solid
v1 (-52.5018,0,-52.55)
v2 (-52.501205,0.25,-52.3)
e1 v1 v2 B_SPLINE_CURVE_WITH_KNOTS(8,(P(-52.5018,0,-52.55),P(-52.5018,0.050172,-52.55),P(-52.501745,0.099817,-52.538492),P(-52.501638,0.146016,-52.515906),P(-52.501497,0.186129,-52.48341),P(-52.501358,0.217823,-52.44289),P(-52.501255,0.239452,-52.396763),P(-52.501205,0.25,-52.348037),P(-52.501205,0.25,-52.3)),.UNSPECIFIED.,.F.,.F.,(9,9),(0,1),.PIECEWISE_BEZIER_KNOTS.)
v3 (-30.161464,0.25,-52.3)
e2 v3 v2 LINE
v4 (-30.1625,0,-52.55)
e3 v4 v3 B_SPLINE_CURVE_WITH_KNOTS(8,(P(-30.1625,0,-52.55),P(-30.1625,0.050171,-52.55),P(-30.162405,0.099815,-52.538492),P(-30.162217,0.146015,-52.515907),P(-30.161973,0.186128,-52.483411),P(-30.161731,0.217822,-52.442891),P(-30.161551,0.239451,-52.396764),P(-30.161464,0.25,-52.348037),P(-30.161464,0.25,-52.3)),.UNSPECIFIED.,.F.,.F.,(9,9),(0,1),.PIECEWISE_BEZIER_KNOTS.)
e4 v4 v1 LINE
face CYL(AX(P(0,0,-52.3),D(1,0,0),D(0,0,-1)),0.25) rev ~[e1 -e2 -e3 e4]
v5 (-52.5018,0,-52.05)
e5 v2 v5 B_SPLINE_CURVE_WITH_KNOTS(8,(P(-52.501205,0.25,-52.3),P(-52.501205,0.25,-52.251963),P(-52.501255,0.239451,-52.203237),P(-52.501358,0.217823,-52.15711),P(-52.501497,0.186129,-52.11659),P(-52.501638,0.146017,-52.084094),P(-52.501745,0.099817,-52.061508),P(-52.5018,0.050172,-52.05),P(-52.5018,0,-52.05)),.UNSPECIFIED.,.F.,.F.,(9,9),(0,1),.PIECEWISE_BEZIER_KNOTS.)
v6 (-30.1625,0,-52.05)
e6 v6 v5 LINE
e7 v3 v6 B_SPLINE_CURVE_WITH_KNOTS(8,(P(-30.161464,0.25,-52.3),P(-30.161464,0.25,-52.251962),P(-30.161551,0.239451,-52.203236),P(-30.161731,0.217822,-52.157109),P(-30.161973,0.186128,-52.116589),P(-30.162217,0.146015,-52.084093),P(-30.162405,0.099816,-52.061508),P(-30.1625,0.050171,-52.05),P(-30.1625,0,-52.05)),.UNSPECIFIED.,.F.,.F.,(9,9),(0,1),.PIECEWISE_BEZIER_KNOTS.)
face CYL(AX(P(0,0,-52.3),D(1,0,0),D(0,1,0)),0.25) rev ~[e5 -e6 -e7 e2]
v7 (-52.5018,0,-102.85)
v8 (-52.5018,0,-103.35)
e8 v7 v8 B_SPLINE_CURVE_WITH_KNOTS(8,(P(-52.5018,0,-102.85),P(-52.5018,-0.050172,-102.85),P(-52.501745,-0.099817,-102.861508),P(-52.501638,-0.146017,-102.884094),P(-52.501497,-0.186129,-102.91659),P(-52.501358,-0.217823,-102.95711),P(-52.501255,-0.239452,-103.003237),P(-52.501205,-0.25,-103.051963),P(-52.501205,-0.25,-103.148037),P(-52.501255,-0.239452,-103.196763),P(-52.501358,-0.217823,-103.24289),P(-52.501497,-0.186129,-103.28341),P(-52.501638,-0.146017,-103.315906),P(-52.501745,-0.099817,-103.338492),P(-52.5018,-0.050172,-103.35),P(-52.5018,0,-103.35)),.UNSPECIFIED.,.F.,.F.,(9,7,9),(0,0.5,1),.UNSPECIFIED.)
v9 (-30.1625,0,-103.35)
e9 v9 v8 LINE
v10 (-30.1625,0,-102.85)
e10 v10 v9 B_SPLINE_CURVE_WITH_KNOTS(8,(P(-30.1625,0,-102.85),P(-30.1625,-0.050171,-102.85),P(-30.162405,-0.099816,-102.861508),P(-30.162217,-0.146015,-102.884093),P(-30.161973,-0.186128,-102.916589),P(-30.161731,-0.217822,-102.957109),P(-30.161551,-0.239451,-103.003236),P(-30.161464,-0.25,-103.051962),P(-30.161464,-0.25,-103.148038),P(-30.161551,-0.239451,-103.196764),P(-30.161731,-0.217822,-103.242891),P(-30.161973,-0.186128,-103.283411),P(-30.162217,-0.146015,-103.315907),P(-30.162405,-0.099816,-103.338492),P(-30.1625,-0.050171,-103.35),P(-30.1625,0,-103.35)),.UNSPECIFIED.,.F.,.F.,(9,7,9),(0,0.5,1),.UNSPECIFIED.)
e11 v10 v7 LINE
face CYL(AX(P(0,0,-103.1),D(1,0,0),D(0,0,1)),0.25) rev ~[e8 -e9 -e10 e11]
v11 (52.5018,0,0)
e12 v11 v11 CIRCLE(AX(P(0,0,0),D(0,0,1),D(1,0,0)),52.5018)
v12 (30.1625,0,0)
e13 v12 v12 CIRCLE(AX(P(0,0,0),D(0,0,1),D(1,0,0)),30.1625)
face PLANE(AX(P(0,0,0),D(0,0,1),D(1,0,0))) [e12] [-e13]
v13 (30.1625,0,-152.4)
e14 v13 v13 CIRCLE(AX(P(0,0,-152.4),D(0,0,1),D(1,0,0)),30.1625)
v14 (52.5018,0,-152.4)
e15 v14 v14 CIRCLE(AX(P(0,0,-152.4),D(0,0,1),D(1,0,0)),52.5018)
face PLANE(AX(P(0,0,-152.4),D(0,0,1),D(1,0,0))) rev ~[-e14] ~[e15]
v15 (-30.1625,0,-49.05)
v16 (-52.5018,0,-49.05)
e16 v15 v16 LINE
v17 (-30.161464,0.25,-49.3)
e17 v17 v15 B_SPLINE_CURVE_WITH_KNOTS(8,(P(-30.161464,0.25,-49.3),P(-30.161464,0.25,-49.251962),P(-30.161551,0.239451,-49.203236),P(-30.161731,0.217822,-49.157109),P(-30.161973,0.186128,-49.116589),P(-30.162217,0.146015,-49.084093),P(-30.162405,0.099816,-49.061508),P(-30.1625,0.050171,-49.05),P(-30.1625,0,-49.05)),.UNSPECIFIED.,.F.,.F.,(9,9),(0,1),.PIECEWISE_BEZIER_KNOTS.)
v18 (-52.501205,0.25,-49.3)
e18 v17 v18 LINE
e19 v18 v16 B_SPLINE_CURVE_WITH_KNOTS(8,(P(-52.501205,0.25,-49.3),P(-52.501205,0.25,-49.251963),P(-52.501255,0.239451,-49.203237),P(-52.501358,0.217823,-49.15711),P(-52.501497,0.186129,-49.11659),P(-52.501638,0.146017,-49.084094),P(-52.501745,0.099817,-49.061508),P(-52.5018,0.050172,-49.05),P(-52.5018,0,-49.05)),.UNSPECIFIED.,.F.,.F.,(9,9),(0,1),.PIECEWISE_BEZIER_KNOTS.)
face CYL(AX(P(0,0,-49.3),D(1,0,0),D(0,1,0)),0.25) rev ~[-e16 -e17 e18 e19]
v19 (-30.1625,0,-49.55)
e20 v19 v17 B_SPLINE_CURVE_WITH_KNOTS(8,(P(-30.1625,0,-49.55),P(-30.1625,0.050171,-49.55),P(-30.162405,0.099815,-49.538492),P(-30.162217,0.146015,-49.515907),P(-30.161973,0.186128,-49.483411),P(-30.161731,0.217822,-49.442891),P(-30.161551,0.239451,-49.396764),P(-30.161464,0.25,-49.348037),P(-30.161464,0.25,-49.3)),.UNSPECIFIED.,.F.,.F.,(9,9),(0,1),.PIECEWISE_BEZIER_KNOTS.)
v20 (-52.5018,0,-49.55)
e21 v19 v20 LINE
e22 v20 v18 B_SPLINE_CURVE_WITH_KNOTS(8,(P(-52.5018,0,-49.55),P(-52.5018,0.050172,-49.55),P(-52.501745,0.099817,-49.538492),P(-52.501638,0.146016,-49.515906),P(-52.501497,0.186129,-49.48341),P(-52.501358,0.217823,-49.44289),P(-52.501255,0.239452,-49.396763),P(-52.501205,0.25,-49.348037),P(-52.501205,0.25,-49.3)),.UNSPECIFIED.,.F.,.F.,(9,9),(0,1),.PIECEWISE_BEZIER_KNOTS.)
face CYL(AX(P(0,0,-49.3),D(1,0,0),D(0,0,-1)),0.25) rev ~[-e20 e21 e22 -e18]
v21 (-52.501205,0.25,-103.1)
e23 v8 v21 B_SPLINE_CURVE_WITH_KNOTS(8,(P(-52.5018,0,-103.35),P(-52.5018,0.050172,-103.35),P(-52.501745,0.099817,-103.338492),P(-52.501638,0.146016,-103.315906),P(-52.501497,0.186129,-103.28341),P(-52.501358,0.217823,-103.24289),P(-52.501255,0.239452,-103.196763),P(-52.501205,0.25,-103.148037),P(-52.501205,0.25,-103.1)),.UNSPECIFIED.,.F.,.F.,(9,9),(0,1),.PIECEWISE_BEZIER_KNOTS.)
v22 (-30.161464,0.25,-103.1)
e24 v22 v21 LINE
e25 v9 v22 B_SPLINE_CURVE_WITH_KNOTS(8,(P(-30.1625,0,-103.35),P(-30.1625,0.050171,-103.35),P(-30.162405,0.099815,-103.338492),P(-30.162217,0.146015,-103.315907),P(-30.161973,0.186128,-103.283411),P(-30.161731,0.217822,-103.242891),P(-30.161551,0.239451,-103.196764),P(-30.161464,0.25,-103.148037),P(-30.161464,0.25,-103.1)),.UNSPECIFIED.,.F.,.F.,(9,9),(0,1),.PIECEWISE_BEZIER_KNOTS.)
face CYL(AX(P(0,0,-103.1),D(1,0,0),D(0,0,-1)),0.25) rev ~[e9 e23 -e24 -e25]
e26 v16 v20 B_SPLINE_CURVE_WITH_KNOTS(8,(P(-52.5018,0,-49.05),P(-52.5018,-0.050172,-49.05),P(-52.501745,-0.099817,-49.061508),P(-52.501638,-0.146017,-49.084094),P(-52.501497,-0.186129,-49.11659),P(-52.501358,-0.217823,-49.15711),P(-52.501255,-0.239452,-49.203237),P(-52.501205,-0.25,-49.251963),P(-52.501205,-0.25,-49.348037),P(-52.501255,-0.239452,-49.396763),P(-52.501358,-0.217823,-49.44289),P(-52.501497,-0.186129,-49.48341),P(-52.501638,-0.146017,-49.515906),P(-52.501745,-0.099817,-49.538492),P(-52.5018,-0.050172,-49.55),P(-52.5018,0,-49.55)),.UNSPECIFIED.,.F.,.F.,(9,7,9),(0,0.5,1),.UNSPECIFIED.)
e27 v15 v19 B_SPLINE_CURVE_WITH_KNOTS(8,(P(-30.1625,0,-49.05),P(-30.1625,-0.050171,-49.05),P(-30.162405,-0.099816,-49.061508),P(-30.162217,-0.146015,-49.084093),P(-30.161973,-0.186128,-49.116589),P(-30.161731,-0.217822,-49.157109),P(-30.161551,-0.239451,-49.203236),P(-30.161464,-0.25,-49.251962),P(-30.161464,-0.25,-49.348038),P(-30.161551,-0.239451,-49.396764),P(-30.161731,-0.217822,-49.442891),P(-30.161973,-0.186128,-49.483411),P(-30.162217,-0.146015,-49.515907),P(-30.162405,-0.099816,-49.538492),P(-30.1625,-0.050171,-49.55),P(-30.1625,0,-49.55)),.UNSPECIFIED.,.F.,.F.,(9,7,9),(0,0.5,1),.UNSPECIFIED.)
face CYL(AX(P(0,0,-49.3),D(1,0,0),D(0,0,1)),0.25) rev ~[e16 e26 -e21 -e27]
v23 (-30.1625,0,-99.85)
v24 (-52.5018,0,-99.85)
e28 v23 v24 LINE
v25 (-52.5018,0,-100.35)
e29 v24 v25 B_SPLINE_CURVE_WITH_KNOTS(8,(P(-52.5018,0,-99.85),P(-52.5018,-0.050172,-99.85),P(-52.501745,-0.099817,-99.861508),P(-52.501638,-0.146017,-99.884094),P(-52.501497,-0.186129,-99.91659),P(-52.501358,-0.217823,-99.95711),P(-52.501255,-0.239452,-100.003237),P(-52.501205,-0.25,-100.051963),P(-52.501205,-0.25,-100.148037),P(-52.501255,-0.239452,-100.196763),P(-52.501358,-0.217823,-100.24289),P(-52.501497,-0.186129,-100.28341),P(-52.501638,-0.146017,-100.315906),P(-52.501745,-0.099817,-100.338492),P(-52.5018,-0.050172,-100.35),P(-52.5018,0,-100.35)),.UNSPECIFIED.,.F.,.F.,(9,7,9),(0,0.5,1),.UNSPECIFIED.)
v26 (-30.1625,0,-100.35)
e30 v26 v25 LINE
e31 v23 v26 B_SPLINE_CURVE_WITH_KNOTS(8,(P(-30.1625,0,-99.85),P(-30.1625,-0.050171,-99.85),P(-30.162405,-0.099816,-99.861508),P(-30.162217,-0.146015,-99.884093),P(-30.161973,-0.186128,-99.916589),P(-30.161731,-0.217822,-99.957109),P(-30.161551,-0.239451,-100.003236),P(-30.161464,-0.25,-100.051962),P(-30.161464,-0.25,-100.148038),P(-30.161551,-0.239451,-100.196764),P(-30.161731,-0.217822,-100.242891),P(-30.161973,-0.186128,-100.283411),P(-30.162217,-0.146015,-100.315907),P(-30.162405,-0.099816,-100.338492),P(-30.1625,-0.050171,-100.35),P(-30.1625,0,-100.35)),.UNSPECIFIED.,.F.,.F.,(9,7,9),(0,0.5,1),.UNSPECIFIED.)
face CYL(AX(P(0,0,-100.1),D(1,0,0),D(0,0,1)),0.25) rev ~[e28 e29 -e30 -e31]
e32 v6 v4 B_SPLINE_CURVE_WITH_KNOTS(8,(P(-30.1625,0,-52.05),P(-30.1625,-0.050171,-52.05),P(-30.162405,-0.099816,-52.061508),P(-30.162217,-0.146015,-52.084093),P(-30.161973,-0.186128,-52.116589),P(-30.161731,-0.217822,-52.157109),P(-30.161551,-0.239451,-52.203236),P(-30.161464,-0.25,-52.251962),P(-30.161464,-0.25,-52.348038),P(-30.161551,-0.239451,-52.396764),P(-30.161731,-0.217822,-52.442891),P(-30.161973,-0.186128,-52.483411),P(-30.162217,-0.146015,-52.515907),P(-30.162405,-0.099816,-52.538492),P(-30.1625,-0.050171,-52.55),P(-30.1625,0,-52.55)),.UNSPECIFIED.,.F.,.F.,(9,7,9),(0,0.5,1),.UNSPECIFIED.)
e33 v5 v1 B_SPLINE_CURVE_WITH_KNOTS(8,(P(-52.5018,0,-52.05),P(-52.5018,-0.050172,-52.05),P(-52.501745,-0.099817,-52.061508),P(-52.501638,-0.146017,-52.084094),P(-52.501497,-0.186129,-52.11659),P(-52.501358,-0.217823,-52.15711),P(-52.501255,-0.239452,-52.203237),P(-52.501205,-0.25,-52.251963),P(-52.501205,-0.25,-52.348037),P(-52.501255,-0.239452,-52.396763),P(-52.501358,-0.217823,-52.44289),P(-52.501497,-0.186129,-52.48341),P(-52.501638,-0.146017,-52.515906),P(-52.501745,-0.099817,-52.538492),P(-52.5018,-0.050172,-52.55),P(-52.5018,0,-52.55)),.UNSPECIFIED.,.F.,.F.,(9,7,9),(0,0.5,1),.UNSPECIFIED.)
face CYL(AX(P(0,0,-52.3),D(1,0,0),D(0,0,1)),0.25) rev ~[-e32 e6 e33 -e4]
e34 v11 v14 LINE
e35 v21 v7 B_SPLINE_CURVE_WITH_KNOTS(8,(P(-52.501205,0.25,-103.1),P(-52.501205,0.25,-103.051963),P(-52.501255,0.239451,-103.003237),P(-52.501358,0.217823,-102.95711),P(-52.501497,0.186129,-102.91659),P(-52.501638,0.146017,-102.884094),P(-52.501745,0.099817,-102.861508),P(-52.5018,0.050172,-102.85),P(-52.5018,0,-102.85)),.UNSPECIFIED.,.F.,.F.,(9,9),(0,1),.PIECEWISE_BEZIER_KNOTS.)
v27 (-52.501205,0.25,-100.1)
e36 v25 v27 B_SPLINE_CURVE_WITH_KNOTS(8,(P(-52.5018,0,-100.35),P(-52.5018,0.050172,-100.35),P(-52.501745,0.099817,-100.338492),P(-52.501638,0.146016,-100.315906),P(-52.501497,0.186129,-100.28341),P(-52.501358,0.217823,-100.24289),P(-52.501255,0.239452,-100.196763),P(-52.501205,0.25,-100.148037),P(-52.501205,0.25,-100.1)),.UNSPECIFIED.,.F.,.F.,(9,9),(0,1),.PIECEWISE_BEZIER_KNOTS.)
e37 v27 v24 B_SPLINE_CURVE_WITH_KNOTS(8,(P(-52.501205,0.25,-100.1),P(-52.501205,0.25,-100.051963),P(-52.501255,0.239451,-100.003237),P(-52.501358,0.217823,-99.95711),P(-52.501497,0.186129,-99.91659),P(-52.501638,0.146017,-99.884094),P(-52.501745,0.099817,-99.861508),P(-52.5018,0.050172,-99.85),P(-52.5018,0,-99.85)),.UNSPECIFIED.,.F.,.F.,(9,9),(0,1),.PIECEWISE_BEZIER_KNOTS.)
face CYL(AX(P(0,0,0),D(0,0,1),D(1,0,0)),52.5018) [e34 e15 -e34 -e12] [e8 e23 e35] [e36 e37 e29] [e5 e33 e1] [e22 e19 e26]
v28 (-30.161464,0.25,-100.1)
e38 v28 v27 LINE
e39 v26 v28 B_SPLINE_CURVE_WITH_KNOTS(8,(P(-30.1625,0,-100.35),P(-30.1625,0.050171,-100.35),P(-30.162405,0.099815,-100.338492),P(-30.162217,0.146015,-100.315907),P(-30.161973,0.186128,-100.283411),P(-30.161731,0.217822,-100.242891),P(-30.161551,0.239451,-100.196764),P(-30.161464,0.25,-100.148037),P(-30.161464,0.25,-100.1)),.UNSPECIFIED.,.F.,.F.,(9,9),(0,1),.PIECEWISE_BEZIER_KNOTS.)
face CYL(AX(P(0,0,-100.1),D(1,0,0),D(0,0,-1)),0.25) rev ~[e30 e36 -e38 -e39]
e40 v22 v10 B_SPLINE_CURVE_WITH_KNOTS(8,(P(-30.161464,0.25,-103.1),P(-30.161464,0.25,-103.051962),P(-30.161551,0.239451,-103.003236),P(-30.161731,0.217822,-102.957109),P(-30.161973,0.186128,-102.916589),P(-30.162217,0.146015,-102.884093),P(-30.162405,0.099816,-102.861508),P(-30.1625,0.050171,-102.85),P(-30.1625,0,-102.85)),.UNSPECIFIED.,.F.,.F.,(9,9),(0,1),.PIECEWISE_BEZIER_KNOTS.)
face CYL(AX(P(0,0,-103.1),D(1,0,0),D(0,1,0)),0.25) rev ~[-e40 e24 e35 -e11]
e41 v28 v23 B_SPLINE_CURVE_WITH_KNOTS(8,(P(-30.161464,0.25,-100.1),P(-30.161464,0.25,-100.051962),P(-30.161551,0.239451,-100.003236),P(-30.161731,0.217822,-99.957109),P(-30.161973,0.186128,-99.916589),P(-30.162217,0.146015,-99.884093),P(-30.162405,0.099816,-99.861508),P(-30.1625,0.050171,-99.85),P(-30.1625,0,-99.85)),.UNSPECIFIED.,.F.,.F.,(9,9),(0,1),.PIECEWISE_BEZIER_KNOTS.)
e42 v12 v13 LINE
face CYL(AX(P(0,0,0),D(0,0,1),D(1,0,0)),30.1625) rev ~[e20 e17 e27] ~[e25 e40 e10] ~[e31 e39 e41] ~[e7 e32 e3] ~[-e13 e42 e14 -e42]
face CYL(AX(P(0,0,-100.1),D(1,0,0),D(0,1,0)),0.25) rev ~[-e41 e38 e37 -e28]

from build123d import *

# Parameters (mm, degrees)
F0_R     = 52.5018
F0_R_2   = 30.1625
F1_DEPTH = 152.4
F3_DEPTH = 52.5028


# Not quite as in the source:
# - a feature names something its author has since deleted; it is built from what else it names


with BuildPart() as f1:
    # F0 (on Top) → F1 (new body)
    with BuildSketch(Plane.XY):
        Circle(F0_R)
        Circle(F0_R_2, mode=Mode.SUBTRACT)
    extrude(amount=-F1_DEPTH)

    # F2 (on Right) → F3 (cut, through all)
    with BuildSketch(Plane.YZ):
        with BuildLine():
            ThreePointArc((0.25, -49.3), (0.1767766953, -49.1232233047), (0, -49.05))
            Line((0, -49.05), (0, -49.55))
            ThreePointArc((0, -49.55), (0.1767766953, -49.4767766953), (0.25, -49.3))
        make_face()
        with BuildLine():
            ThreePointArc((0.25, -103.1), (0.1767766953, -102.9232233047), (0, -102.85))
            Line((0, -102.85), (0, -103.35))
            ThreePointArc((0, -103.35), (0.1767766953, -103.2767766953), (0.25, -103.1))
        make_face()
        with BuildLine():
            Line((0, -103.35), (0, -102.85))
            ThreePointArc((0, -102.85), (-0.25, -103.1), (0, -103.35))
        make_face()
        with BuildLine():
            ThreePointArc((0.25, -100.1), (0.1767766953, -99.9232233047), (0, -99.85))
            Line((0, -99.85), (0, -100.35))
            ThreePointArc((0, -100.35), (0.1767766953, -100.2767766953), (0.25, -100.1))
        make_face()
        with BuildLine():
            Line((0, -100.35), (0, -99.85))
            ThreePointArc((0, -99.85), (-0.25, -100.1), (0, -100.35))
        make_face()
        with BuildLine():
            ThreePointArc((0.25, -52.3), (0.1767766953, -52.1232233047), (0, -52.05))
            Line((0, -52.05), (0, -52.55))
            ThreePointArc((0, -52.55), (0.1767766953, -52.4767766953), (0.25, -52.3))
        make_face()
        with BuildLine():
            Line((0, -52.55), (0, -52.05))
            ThreePointArc((0, -52.05), (-0.25, -52.3), (0, -52.55))
        make_face()
        with BuildLine():
            Line((0, -49.55), (0, -49.05))
            ThreePointArc((0, -49.05), (-0.25, -49.3), (0, -49.55))
        make_face()
    extrude(amount=-F3_DEPTH, mode=Mode.SUBTRACT)


solid = f1.part
